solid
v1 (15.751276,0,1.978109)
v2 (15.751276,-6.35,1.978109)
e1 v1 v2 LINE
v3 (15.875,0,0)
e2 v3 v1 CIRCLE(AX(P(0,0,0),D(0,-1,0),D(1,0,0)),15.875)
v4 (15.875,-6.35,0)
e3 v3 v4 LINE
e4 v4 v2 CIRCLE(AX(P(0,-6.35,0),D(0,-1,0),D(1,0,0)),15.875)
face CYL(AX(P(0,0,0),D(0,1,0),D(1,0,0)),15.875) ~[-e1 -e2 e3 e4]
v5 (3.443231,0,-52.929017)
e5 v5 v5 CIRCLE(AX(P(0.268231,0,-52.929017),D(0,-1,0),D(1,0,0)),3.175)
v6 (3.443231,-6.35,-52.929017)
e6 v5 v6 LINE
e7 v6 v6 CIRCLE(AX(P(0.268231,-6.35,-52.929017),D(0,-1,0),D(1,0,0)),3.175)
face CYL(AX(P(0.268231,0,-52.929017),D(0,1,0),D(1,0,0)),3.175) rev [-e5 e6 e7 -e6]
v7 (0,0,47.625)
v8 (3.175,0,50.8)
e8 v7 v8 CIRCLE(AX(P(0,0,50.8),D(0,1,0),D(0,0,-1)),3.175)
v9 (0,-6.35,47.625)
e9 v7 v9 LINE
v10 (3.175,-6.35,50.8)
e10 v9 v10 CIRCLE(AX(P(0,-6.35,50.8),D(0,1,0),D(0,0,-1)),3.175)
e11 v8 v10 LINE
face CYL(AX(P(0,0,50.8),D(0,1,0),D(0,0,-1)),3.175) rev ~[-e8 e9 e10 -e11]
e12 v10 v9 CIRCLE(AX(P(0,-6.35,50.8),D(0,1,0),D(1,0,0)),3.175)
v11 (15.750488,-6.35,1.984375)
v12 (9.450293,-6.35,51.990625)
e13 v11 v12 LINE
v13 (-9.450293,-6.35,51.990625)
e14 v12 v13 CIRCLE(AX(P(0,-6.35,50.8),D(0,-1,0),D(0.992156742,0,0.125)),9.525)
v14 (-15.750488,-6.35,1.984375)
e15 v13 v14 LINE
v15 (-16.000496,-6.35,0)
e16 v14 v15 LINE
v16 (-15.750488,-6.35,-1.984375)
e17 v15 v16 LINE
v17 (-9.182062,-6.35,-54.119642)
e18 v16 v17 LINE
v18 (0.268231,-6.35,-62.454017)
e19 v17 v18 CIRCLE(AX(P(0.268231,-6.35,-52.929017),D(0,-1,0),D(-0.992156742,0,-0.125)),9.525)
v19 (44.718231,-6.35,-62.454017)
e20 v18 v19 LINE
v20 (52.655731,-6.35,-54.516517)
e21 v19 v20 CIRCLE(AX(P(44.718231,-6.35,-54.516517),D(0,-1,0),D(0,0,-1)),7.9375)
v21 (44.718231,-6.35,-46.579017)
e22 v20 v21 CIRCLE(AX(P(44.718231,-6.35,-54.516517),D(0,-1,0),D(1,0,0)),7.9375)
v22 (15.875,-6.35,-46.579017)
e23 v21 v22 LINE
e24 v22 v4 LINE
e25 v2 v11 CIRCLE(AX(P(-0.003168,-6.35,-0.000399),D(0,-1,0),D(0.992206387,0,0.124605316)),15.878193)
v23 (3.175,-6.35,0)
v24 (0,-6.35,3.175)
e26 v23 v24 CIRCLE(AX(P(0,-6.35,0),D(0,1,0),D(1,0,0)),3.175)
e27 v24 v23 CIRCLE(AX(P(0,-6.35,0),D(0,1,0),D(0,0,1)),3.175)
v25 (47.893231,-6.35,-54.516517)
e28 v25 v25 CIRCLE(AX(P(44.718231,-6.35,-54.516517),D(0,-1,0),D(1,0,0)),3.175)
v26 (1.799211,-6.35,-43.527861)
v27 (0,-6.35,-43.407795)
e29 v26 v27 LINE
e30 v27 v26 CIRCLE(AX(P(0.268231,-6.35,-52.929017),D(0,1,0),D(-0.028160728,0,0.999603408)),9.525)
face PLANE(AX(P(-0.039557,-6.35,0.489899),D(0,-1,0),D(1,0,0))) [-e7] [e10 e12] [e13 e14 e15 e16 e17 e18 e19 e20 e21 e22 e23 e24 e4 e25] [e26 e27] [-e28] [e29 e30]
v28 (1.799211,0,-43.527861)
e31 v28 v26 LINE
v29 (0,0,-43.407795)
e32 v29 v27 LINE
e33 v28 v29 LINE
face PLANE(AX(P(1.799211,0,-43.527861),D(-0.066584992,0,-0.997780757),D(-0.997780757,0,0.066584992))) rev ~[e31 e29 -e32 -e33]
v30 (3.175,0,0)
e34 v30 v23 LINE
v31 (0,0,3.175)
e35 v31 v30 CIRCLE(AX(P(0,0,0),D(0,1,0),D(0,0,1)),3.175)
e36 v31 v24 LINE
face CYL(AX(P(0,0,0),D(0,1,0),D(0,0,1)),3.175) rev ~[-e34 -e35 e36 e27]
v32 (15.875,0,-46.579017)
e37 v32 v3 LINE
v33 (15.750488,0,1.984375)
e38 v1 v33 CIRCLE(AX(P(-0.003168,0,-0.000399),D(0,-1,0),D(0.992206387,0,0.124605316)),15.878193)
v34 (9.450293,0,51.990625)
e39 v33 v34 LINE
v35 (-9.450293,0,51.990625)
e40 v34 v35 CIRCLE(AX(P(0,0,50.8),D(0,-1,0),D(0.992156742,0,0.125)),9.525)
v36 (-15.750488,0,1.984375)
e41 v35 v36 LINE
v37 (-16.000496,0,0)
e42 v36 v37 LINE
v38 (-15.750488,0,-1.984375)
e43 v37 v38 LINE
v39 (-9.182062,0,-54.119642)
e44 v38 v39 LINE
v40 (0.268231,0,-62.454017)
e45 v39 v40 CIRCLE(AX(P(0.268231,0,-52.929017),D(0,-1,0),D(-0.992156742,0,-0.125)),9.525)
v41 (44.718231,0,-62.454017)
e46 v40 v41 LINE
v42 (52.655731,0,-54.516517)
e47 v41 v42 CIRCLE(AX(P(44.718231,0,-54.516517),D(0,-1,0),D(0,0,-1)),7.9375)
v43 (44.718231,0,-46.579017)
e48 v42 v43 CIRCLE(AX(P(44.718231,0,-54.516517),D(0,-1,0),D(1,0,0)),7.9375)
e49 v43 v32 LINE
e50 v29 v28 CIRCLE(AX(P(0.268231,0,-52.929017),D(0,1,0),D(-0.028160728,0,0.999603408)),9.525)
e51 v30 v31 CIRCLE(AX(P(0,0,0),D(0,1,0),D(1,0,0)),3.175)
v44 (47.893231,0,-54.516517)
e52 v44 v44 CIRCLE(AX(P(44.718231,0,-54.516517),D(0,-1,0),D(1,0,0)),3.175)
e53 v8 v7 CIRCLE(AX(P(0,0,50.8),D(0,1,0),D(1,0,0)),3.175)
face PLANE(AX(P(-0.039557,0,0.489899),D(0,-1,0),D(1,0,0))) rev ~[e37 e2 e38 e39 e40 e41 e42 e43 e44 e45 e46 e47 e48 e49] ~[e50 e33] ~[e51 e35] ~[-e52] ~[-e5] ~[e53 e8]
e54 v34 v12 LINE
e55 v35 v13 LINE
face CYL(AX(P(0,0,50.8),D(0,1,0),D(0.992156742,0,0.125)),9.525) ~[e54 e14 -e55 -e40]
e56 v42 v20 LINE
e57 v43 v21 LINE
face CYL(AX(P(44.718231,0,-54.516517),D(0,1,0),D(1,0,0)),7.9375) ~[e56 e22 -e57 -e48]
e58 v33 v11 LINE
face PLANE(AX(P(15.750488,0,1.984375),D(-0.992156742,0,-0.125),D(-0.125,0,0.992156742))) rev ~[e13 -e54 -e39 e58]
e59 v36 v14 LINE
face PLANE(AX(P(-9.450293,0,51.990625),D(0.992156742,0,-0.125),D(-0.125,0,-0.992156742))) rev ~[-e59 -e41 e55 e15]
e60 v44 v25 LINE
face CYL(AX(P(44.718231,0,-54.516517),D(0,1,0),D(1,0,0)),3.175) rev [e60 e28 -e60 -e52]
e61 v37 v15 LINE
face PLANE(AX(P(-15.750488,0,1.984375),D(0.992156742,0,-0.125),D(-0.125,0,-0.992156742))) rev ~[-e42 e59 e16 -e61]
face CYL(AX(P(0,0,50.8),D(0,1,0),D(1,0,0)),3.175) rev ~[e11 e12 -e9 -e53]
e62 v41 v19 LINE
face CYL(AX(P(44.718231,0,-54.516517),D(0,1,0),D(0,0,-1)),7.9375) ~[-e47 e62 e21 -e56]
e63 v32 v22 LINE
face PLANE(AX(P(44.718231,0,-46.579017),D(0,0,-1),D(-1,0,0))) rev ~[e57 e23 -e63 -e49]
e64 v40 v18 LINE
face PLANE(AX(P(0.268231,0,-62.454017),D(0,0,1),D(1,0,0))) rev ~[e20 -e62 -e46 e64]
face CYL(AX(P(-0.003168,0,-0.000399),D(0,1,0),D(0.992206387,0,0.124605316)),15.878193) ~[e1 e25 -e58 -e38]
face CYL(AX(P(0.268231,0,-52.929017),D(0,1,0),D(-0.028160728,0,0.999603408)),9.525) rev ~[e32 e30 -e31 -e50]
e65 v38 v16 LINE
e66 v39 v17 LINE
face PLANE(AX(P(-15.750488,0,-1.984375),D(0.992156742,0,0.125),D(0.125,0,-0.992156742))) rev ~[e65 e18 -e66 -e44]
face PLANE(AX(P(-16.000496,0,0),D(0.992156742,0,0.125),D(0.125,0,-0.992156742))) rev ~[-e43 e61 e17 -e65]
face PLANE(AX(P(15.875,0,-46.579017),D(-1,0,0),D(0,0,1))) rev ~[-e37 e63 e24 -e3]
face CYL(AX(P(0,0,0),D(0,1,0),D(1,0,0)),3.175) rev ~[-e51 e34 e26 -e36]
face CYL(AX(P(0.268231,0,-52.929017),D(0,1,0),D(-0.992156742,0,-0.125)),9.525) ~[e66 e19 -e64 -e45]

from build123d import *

# Parameters (mm, degrees)
F0_R     = 3.175
F1_DEPTH = 6.35


# Not quite as in the source:
# - the program builds the solid bodies; features that only make, move or delete a surface that nothing else refers to are left out


with BuildPart() as f1:
    # F0 (on Front) → F1 (new body)
    with BuildSketch(Plane.XZ):
        with BuildLine():
            ThreePointArc((15.7504882737, 1.984375), (10.5003255158, 11.90625), (0, 15.875))
            ThreePointArc((0, 15.875), (-10.500325544, 11.9062499751), (-15.7504882831, 1.9843749253))
            ThreePointArc((-15.7504882831, 1.9843749253), (-15.875, -5.44e-08), (-15.7504882695, -1.9843750333))
            ThreePointArc((-15.7504882695, -1.9843750333), (0.9941387534, -15.8438414893), (15.875, 0))
            ThreePointArc((15.875, 0), (15.8440389276, 0.9909871135), (15.7512764776, 1.9781087752))
            ThreePointArc((15.7512764776, 1.9781087752), (15.7508826872, 1.9812419268), (15.7504882737, 1.984375))
        make_face()
        with BuildLine():
            ThreePointArc((0, 3.175), (2.2450640303, 2.2450640303), (3.175, 0))
            ThreePointArc((3.175, 0), (-2.2450640303, -2.2450640303), (0, 3.175))
        make_face(mode=Mode.SUBTRACT)
        with BuildLine():
            ThreePointArc((-15.7504882831, 1.9843749253), (-10.500325544, 11.9062499751), (0, 15.875))
            Line((0, 15.875), (0, 41.275))
            ThreePointArc((0, 41.275), (-7.14375, 44.4998046905), (-9.4502929642, 51.990625))
            Line((-9.4502929642, 51.990625), (-15.7504882831, 1.9843749253))
        make_face()
        with BuildLine():
            Line((0, 41.275), (0, 15.875))
            ThreePointArc((0, 15.875), (10.5003255158, 11.90625), (15.7504882737, 1.984375))
            Line((15.7504882737, 1.984375), (9.4502929642, 51.990625))
            ThreePointArc((9.4502929642, 51.990625), (9.5063048942, 51.396483242), (9.525, 50.8))
            ThreePointArc((9.525, 50.8), (6.7351920908, 44.0648079092), (0, 41.275))
        make_face()
        with BuildLine():
            ThreePointArc((-15.7504882695, -1.9843750333), (-15.875, -5.44e-08), (-15.7504882831, 1.9843749253))
            Line((-15.7504882831, 1.9843749253), (-16.0004960241, 0))
            Line((-16.0004960241, 0), (-15.7504882695, -1.9843750333))
        make_face()
        with BuildLine():
            ThreePointArc((-9.4502929642, 51.990625), (-7.14375, 44.4998046905), (0, 41.275))
            ThreePointArc((0, 41.275), (6.7351920908, 44.0648079092), (9.525, 50.8))
            ThreePointArc((9.525, 50.8), (9.5063048942, 51.396483242), (9.4502929642, 51.990625))
            ThreePointArc((9.4502929642, 51.990625), (0, 60.325), (-9.4502929642, 51.990625))
        make_face()
        with BuildLine():
            ThreePointArc((3.175, 50.8), (2.2450640303, 48.5549359697), (0, 47.625))
            ThreePointArc((0, 47.625), (-2.2450640303, 53.0450640303), (3.175, 50.8))
        make_face(mode=Mode.SUBTRACT)
        with BuildLine():
            ThreePointArc((15.875, 0), (0.9941387534, -15.8438414893), (-15.7504882695, -1.9843750333))
            Line((-15.7504882695, -1.9843750333), (-9.182062028, -54.1196420534))
            ThreePointArc((-9.182062028, -54.1196420534), (-6.9635285808, -46.7300430021), (0, -43.4077945917))
            ThreePointArc((0, -43.4077945917), (0.9024529842, -43.4251553439), (1.7992106078, -43.5278614731))
            ThreePointArc((1.7992106078, -43.5278614731), (7.5245456473, -46.7588045924), (9.7932309362, -52.9290170534))
            ThreePointArc((9.7932309362, -52.9290170534), (7.003423027, -59.6642091442), (0.2682309362, -62.4540170534))
            Line((0.2682309362, -62.4540170534), (44.7182309362, -62.4540170534))
            ThreePointArc((44.7182309362, -62.4540170534), (36.7807309362, -54.5165170534), (44.7182309362, -46.5790170534))
            Line((44.7182309362, -46.5790170534), (15.875, -46.5790170534))
            Line((15.875, -46.5790170534), (15.875, 0))
        make_face()
        with BuildLine():
            ThreePointArc((0, -43.4077945917), (-6.9635285808, -46.7300430021), (-9.182062028, -54.1196420534))
            ThreePointArc((-9.182062028, -54.1196420534), (-6.0319643733, -60.0727670534), (0.2682309362, -62.4540170534))
            ThreePointArc((0.2682309362, -62.4540170534), (7.003423027, -59.6642091442), (9.7932309362, -52.9290170534))
            ThreePointArc((9.7932309362, -52.9290170534), (7.5245456473, -46.7588045924), (1.7992106078, -43.5278614731))
            Line((1.7992106078, -43.5278614731), (0, -43.4077945917))
        make_face()
        with Locations((0.2682309362, -52.9290170534)):
            Circle(F0_R, mode=Mode.SUBTRACT)
        with BuildLine():
            ThreePointArc((52.6557309362, -54.5165170534), (50.3308910119, -48.9038569777), (44.7182309362, -46.5790170534))
            ThreePointArc((44.7182309362, -46.5790170534), (36.7807309362, -54.5165170534), (44.7182309362, -62.4540170534))
            ThreePointArc((44.7182309362, -62.4540170534), (50.3308910119, -60.1291771291), (52.6557309362, -54.5165170534))
        make_face()
        with Locations((44.7182309362, -54.5165170534)):
            Circle(F0_R, mode=Mode.SUBTRACT)
    extrude(amount=F1_DEPTH)


solid = f1.part
